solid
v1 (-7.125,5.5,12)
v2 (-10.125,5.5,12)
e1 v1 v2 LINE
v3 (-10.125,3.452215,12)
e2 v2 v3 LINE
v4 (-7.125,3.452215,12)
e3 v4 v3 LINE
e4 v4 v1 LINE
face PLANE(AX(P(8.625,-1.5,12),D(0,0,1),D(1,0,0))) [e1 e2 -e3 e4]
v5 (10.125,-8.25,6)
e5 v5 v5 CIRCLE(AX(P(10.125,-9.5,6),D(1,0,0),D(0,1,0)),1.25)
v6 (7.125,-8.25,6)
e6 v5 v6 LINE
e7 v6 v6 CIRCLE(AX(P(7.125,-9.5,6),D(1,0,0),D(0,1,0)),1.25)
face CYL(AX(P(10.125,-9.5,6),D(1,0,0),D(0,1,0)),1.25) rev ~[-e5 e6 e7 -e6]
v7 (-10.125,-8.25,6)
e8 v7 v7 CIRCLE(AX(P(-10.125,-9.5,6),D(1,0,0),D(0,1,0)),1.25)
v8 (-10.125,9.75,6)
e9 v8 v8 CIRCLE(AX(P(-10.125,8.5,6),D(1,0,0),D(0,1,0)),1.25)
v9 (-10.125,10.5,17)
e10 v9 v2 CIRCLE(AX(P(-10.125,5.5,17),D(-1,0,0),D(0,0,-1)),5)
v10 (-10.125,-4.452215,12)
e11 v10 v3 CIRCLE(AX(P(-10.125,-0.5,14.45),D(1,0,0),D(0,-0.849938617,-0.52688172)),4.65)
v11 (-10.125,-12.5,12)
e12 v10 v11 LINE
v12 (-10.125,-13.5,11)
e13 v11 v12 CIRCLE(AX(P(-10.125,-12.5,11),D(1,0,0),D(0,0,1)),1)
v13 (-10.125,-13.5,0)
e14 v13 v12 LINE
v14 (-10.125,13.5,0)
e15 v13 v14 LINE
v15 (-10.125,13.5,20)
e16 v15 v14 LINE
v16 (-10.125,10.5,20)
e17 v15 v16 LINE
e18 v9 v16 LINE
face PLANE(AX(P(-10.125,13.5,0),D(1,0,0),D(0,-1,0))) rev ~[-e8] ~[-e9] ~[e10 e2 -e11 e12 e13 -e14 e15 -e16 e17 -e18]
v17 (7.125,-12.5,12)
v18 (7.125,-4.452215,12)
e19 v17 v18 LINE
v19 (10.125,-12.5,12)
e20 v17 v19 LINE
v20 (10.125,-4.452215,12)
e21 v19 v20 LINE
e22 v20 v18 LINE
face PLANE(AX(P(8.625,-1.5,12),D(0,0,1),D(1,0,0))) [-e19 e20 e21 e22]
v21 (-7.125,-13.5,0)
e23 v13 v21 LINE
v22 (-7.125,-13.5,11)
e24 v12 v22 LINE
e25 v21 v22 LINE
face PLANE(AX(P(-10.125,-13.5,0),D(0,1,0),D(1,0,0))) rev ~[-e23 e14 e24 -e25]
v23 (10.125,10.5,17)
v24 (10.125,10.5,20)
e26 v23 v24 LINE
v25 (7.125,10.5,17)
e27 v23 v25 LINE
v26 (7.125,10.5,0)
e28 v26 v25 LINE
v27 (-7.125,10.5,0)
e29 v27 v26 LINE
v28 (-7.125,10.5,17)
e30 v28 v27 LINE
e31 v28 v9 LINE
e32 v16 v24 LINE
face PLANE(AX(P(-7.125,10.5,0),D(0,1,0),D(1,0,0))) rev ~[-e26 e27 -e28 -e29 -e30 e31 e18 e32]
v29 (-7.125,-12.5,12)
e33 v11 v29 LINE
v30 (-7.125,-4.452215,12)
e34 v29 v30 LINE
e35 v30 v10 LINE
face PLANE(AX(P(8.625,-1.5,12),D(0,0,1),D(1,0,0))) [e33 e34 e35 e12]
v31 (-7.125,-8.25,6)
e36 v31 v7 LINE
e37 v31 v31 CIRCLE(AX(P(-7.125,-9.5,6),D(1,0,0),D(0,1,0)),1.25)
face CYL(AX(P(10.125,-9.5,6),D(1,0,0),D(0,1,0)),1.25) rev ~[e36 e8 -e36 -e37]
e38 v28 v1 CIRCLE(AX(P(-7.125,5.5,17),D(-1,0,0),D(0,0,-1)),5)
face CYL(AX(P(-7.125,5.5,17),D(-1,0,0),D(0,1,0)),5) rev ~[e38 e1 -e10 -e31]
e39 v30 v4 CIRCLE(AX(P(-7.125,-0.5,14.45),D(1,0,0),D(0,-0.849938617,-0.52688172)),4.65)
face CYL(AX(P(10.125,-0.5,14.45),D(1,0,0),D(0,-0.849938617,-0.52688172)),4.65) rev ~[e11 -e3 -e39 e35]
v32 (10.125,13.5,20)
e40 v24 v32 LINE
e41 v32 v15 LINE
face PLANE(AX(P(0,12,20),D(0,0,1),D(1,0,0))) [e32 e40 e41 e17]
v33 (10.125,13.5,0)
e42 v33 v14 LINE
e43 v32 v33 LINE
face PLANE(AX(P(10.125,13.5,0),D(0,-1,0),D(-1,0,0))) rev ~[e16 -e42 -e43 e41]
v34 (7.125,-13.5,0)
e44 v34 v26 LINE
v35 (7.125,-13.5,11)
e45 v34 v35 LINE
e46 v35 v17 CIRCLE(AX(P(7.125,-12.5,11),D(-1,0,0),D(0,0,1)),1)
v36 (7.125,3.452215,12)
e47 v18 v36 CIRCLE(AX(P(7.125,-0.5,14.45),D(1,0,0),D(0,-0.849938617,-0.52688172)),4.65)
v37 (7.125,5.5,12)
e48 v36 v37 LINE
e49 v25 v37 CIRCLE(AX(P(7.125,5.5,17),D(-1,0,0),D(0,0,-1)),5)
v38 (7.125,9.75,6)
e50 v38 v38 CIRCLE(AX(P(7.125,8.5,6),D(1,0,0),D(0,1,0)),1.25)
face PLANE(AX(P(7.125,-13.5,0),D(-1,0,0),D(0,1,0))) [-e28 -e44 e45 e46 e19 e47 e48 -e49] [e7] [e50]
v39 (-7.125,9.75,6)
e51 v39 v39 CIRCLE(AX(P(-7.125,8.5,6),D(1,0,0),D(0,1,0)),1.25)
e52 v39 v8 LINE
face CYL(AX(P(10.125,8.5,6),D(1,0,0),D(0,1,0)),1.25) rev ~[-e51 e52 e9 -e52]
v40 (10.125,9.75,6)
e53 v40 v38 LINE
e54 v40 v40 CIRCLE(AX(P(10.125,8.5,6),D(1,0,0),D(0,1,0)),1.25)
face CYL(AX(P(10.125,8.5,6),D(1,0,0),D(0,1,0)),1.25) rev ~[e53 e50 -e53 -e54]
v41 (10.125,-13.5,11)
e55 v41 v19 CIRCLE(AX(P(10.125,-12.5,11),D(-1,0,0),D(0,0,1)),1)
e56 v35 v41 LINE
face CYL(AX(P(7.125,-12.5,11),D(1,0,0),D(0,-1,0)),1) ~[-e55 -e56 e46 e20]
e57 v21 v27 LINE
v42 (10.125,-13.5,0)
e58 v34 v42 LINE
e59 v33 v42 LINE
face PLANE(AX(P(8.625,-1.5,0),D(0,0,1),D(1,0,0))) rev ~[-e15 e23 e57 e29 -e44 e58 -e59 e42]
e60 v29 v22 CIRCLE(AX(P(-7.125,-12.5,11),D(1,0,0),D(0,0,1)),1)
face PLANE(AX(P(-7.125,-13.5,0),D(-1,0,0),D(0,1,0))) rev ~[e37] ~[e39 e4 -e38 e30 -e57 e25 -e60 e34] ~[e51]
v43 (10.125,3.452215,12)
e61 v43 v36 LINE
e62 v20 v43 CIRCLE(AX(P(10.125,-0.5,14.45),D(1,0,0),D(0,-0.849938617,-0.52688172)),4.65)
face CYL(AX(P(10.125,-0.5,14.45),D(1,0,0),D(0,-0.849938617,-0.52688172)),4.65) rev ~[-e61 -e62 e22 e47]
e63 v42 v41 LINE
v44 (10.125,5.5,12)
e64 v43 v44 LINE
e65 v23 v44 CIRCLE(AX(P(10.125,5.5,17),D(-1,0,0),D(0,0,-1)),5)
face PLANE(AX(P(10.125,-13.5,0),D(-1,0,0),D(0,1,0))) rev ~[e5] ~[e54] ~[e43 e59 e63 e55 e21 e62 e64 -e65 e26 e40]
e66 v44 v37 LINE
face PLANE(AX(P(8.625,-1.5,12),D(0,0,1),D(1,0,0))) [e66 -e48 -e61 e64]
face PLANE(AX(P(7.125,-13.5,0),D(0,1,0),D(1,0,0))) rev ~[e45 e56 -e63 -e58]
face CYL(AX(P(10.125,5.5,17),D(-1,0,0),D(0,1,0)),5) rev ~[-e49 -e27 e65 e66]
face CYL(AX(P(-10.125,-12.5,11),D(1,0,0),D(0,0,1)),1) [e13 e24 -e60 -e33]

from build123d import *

# Parameters (mm, degrees)
F0_W     = 3
F0_H     = 24
F1_DEPTH = 12
F2_R     = 1.25
F3_DEPTH = 150
F4_DEPTH = 20
F5_R     = 5
F6_R     = 1
F7_DEPTH = 150


# Not quite as in the source:
# - a feature names something its author has since deleted; it is built from what else it names


with BuildPart() as f1:
    # F0 (on Top) → F1 (new body)
    with BuildSketch(Plane.XY):
        with Locations((8.625, -1.5)):
            Rectangle(F0_W, F0_H)
        with Locations((-8.625, -1.5)):
            Rectangle(F0_W, F0_H)
        Polygon((10.125, 13.5), (-10.125, 13.5), (-10.125, 10.5), (-7.125, 10.5), (7.125, 10.5), (10.125, 10.5), align=None)
    extrude(amount=F1_DEPTH)

    # F2 (on face) → F3 (cut)
    with BuildSketch(Plane.YZ.offset(10.125)):
        with Locations((-9.5, 6)):
            Circle(F2_R)
        with Locations((8.5, 6)):
            Circle(F2_R)
    extrude(amount=-F3_DEPTH, mode=Mode.SUBTRACT)

    # F0 (on Top) → F4 (join)
    with BuildSketch(Plane.XY):
        Polygon((10.125, 13.5), (-10.125, 13.5), (-10.125, 10.5), (-7.125, 10.5), (7.125, 10.5), (10.125, 10.5), align=None)
    extrude(amount=F4_DEPTH)

    # F5
    f5_edges = [f1.edges().sort_by_distance(p)[0] for p in [
        (8.625, 10.5, 12),
        (-8.625, 10.5, 12),
    ]]
    fillet(f5_edges, radius=F5_R)

    # F6
    f6_edges = [f1.edges().sort_by_distance(p)[0] for p in [
        (8.625, -13.5, 12),
        (-8.625, -13.5, 12),
    ]]
    fillet(f6_edges, radius=F6_R)

    # F2 (on face) → F7 (cut)
    with BuildSketch(Plane.YZ.offset(10.125)):
        with BuildLine():
            ThreePointArc((-4.4522145691, 12), (-0.5, 9.8), (3.4522145691, 12))
            Line((3.4522145691, 12), (-4.4522145691, 12))
        make_face()
    extrude(amount=-F7_DEPTH, mode=Mode.SUBTRACT)


solid = f1.part
